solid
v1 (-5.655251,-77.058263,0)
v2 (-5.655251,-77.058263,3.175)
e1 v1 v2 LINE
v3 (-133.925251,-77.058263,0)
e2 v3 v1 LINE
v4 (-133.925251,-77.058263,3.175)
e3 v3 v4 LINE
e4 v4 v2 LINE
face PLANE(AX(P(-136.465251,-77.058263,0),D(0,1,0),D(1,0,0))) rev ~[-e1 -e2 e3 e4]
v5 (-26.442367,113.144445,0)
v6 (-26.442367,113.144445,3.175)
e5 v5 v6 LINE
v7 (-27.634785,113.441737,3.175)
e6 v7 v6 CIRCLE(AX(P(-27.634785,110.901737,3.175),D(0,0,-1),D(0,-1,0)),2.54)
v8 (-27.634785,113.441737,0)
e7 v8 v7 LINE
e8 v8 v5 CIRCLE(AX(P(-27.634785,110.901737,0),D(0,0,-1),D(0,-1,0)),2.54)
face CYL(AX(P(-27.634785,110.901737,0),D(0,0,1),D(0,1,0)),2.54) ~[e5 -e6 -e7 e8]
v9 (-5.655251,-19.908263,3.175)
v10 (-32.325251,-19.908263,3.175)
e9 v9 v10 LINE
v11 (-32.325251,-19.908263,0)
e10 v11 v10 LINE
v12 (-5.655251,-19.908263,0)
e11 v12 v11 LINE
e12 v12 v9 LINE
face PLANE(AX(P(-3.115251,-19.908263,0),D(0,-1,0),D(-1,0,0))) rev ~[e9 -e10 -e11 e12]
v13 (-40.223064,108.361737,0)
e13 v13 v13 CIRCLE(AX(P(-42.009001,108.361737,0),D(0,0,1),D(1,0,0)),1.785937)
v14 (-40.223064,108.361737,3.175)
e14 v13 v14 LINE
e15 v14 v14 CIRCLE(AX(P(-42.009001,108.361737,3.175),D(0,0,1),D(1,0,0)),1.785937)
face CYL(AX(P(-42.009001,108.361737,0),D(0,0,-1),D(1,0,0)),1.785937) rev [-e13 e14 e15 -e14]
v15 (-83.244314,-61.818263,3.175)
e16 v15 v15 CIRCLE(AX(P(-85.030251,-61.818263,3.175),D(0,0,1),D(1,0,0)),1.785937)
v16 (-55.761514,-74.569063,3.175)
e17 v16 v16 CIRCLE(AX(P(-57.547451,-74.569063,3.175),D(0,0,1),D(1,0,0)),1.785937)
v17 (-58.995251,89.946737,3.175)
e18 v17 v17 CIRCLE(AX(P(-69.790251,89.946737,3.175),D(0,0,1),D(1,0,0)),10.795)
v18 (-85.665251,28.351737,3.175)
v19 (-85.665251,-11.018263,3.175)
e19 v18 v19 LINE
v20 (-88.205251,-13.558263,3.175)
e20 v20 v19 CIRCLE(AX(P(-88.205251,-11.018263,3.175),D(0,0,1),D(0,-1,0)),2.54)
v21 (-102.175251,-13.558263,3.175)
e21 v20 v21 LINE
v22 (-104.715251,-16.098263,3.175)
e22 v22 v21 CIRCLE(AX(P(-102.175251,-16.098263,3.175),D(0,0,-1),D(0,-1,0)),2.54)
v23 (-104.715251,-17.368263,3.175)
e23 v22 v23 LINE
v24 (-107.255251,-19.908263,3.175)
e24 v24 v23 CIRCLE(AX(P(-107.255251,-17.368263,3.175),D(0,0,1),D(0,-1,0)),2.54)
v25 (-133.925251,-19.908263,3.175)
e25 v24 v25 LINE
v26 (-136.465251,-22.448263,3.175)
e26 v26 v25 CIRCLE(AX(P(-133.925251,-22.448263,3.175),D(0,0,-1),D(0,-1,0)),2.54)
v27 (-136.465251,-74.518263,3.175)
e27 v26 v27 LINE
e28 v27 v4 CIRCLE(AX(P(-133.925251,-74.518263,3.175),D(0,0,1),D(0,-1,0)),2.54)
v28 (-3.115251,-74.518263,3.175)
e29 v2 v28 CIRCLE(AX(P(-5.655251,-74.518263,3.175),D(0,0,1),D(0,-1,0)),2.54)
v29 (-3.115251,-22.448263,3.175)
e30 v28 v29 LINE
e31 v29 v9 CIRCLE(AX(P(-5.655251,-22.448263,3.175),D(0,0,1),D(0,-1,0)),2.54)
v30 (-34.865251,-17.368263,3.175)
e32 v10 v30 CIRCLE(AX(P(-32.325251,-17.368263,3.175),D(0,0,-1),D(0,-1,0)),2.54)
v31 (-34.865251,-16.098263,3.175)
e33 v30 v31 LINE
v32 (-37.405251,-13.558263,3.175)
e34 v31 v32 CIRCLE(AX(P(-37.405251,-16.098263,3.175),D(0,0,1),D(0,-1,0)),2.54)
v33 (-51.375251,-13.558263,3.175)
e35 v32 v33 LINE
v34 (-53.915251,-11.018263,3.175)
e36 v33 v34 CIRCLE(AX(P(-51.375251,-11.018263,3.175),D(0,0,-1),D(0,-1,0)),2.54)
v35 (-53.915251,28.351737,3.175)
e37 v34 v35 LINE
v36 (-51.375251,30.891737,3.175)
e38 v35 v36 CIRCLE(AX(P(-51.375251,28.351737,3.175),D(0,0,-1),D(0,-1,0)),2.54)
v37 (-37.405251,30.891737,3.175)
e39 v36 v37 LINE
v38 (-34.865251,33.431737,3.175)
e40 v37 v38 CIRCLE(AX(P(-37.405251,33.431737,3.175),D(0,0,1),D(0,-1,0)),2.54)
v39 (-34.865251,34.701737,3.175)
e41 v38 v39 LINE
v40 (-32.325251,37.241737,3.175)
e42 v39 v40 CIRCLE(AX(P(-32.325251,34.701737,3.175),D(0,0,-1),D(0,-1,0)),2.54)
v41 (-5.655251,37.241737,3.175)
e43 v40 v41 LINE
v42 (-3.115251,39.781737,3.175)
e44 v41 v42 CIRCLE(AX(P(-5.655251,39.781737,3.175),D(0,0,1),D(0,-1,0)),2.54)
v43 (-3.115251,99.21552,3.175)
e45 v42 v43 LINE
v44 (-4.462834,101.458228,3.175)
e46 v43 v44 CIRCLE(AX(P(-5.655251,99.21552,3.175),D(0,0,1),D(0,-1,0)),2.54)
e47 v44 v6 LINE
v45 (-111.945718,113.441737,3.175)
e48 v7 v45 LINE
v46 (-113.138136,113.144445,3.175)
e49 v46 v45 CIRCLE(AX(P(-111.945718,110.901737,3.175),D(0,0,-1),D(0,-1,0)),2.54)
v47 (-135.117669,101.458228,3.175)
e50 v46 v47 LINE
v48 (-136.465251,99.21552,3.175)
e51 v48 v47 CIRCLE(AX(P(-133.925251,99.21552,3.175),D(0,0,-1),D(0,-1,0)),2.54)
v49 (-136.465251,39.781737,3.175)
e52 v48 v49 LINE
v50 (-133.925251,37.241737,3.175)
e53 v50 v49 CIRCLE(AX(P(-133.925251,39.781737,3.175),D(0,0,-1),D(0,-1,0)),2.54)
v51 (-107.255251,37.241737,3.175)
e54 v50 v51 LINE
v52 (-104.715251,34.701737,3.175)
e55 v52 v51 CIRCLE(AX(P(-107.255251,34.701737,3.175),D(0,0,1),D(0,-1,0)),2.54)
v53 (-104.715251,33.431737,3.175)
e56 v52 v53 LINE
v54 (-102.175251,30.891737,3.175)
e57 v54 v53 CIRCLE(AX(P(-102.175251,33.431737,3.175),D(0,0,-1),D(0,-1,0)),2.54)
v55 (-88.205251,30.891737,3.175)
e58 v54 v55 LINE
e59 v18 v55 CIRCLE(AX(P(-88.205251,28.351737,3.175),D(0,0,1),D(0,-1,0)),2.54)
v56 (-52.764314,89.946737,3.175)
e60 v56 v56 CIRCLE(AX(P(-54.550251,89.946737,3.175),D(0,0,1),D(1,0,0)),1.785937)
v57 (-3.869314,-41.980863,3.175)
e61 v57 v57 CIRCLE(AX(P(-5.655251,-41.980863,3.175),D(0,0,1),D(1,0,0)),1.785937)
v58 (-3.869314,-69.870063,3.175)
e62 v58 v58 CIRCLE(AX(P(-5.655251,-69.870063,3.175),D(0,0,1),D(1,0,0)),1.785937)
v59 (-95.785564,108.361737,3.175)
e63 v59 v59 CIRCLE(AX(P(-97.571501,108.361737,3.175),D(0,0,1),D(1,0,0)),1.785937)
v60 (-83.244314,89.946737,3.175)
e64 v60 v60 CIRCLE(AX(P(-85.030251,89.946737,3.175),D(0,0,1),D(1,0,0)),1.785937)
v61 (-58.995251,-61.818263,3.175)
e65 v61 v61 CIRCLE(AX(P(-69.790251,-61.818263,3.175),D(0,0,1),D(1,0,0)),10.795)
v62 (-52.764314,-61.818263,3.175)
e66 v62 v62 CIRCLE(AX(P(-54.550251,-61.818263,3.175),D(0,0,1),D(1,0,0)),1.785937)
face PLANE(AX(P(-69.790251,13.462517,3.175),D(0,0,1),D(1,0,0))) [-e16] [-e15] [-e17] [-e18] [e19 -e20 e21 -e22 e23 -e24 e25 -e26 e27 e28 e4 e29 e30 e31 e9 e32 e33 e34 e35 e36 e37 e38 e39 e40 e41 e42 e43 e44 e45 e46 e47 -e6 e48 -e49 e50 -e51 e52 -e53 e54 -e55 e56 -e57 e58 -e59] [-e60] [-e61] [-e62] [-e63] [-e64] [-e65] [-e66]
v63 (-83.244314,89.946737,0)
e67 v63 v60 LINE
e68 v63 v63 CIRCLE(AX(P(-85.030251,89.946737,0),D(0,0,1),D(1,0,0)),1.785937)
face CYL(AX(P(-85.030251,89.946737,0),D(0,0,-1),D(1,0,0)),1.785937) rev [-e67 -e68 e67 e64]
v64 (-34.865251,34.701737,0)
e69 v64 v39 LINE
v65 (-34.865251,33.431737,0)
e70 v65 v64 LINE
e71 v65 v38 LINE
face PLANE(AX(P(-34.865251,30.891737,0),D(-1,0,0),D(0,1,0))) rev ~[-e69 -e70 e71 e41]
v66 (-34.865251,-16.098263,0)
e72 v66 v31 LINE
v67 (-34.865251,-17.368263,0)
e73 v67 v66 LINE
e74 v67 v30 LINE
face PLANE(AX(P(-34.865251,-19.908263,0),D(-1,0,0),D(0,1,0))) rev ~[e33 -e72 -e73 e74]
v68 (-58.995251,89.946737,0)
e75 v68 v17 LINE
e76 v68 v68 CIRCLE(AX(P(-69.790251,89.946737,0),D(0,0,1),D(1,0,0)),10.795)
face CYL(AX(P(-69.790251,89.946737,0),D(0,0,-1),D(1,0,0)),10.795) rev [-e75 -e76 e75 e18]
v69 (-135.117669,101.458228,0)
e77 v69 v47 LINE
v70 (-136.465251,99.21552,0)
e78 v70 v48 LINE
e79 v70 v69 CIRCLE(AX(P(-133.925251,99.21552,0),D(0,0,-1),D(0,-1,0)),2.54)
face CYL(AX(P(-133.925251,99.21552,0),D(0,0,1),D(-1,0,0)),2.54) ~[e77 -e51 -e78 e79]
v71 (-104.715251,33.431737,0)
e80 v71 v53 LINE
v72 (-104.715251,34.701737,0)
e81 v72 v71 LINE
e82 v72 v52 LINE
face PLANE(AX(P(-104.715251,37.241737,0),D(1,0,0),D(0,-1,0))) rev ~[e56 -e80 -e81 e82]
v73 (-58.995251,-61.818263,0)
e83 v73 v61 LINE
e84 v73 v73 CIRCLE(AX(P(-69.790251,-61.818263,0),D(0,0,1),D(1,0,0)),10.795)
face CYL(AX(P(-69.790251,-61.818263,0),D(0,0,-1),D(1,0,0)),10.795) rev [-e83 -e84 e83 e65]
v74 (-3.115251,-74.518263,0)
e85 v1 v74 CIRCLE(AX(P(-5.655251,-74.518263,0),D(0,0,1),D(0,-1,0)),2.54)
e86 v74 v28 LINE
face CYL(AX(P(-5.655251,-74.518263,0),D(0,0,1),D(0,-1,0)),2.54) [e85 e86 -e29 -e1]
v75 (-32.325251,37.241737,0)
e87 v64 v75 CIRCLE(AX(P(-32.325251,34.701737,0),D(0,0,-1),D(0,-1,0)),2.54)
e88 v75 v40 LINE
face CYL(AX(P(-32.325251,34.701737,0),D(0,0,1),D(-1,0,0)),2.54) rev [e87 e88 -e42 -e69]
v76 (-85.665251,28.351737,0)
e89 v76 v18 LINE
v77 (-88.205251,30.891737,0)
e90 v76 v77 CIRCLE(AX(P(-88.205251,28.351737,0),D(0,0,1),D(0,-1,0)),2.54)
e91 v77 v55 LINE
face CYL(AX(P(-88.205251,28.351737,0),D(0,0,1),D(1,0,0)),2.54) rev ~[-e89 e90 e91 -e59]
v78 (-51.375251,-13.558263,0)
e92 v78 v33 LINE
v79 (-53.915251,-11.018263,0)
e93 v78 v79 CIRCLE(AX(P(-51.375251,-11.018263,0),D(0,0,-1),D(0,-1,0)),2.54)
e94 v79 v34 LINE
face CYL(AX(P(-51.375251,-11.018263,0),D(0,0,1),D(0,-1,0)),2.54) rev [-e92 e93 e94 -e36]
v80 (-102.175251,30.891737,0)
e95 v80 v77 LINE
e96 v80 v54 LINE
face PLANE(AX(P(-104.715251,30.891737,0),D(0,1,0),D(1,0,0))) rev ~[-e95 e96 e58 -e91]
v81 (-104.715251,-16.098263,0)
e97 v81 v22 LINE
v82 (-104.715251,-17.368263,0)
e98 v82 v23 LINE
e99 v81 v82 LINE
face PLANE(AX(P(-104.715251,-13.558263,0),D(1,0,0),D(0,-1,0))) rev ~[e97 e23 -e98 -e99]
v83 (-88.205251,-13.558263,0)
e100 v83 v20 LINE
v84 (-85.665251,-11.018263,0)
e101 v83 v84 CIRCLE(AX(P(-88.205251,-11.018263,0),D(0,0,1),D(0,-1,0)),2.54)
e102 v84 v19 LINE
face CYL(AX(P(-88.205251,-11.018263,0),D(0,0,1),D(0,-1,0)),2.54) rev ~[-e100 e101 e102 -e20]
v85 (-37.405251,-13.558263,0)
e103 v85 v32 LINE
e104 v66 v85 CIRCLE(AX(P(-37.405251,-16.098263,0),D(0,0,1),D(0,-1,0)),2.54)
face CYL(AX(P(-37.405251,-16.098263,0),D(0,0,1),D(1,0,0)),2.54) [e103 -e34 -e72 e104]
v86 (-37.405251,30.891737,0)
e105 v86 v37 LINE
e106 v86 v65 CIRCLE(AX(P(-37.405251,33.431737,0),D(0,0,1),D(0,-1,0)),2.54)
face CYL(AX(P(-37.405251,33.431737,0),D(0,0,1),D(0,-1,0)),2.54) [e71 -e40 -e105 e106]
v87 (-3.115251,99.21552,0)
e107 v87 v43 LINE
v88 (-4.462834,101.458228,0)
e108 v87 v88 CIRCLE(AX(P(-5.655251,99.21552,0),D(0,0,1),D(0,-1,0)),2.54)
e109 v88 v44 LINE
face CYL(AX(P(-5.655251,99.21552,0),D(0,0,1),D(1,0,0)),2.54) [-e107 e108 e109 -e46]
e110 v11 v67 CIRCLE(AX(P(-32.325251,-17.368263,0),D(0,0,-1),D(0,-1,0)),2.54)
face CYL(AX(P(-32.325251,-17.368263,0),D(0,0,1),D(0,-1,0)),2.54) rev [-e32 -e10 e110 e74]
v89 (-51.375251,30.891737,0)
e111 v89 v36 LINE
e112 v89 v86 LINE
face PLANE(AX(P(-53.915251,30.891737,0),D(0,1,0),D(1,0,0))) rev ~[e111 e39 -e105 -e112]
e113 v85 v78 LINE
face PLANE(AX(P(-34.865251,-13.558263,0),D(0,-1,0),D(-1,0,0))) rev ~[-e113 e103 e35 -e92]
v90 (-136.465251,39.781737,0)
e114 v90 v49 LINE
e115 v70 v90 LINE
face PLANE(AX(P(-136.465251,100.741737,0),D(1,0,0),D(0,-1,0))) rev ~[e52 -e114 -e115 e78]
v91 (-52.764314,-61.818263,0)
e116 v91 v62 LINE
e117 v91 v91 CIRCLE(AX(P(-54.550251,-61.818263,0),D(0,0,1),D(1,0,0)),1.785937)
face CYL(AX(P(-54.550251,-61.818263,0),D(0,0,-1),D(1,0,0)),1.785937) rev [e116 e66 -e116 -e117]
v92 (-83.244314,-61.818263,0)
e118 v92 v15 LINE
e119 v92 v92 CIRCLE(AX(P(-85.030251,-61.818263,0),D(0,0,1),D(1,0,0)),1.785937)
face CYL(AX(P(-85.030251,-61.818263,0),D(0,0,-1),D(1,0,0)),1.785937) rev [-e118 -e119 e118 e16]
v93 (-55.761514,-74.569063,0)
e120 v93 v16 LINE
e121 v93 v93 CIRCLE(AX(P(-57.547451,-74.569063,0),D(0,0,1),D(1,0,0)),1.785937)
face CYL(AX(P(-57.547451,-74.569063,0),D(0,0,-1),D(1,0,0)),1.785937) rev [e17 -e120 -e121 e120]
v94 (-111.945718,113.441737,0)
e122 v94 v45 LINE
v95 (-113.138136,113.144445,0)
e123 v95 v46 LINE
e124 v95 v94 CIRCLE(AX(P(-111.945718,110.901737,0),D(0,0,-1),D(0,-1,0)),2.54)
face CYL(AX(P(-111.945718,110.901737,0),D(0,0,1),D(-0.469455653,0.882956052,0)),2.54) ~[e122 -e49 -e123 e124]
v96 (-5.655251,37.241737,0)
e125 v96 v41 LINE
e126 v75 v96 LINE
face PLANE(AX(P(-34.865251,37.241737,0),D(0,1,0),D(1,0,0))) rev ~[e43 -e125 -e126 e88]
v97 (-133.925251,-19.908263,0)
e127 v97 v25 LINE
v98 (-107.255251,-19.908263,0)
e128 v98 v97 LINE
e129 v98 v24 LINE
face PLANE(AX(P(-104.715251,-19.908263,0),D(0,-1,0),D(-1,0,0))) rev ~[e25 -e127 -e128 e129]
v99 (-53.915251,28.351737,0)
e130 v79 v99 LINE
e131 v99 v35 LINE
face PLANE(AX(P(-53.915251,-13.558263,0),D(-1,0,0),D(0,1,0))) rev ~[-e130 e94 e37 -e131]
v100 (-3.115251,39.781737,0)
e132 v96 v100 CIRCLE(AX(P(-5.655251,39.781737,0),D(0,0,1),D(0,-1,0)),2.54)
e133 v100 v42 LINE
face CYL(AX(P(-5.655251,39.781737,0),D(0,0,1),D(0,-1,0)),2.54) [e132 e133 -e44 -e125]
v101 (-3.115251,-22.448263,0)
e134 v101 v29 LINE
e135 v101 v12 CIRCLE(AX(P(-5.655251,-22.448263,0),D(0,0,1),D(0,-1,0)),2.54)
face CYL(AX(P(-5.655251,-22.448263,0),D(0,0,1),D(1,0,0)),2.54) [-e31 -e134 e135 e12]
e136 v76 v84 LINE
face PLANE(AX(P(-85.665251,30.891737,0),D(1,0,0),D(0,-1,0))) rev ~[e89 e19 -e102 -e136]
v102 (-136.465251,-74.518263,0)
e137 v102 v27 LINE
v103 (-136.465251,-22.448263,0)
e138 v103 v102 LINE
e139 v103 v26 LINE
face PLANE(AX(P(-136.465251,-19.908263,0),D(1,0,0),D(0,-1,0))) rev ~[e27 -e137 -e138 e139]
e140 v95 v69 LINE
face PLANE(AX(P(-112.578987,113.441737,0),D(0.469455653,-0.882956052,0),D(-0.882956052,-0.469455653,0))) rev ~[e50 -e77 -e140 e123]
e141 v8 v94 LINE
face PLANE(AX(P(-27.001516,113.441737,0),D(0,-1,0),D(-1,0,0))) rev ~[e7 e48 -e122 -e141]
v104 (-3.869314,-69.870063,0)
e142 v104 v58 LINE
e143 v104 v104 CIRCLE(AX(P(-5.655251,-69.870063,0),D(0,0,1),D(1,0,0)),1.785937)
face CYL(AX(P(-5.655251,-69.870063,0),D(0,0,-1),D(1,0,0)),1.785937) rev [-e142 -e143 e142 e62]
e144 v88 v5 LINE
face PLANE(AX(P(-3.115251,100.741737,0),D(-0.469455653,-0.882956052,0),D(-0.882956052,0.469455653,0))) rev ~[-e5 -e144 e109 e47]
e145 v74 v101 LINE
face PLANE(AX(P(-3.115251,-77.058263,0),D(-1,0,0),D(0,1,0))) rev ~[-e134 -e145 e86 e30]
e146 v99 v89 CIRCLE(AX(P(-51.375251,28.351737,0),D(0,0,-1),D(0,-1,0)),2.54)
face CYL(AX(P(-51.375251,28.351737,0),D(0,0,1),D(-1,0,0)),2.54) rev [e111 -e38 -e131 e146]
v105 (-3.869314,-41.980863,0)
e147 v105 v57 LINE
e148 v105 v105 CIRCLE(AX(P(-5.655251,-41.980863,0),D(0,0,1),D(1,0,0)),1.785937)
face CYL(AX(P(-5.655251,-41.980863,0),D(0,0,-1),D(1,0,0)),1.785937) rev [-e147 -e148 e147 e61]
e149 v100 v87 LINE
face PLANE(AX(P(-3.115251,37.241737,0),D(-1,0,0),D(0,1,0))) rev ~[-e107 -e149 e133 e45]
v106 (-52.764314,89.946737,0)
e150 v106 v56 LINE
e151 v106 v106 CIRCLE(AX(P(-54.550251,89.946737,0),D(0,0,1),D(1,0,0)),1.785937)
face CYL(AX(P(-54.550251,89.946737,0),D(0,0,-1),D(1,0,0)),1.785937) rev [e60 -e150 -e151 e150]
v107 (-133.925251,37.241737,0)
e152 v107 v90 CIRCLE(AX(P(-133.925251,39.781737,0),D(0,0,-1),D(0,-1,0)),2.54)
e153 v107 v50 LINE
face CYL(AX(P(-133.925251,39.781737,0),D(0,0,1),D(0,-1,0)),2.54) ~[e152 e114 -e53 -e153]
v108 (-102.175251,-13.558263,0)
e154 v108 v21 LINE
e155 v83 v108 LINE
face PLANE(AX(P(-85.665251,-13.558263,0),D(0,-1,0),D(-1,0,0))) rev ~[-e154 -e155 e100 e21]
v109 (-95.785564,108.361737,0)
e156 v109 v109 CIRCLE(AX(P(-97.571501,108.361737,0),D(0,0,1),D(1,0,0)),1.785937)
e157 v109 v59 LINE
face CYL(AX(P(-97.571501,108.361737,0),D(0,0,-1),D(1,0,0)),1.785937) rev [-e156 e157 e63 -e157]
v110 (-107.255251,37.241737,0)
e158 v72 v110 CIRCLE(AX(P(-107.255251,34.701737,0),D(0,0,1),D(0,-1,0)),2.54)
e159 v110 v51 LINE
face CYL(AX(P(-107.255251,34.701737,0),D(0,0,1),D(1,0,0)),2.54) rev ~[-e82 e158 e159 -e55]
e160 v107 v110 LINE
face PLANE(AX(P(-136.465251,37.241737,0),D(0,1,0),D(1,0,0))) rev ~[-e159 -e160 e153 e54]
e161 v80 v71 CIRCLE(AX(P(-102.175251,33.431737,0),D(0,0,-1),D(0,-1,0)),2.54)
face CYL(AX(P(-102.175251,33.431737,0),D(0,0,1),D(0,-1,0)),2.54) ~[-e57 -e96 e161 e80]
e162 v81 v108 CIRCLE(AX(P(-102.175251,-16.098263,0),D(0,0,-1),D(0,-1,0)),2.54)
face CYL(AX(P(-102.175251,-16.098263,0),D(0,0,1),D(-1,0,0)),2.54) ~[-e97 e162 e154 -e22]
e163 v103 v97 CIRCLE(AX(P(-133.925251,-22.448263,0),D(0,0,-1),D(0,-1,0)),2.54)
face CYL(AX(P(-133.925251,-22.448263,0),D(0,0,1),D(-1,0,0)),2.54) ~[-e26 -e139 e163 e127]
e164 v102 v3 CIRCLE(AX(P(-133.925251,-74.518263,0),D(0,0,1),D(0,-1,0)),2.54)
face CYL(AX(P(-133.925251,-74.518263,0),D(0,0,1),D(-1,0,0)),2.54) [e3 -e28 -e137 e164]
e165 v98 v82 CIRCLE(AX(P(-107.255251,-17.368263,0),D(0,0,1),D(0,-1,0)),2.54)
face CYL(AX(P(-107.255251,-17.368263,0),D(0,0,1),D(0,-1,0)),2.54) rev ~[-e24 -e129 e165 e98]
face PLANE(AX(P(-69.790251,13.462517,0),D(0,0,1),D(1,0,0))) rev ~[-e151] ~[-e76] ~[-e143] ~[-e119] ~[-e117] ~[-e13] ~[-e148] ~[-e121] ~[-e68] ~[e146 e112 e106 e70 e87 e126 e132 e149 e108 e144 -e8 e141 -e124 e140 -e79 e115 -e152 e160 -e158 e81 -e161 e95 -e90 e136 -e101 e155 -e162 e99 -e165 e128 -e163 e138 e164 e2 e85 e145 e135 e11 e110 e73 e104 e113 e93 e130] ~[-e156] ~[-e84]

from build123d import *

# Parameters (mm, degrees)
F0_R     = 1.7859375
F0_R_2   = 10.795
F1_DEPTH = 3.175
F2_R     = 2.54


with BuildPart() as f1:
    # F0 (on Top) → F1 (new body)
    with BuildSketch(Plane.XY):
        Polygon((-136.4652514458, -19.908263123), (-136.4652514458, -77.058263123), (-3.1152514458, -77.058263123), (-3.1152514458, -19.908263123), (-34.8652514458, -19.908263123), (-34.8652514458, -13.558263123), (-53.9152514458, -13.558263123), (-53.9152514458, 30.891736877), (-34.8652514458, 30.891736877), (-34.8652514458, 37.241736877), (-3.1152514458, 37.241736877), (-3.1152514458, 100.741736877), (-27.0015158653, 113.441736877), (-112.5789870262, 113.441736877), (-136.4652514458, 100.741736877), (-136.4652514458, 37.241736877), (-104.7152514458, 37.241736877), (-104.7152514458, 30.891736877), (-85.6652514458, 30.891736877), (-85.6652514458, -13.558263123), (-104.7152514458, -13.558263123), (-104.7152514458, -19.908263123), align=None)
        with Locations((-85.0302514458, -61.818263123)):
            Circle(F0_R, mode=Mode.SUBTRACT)
        with Locations((-57.5474514458, -74.569063123)):
            Circle(F0_R, mode=Mode.SUBTRACT)
        with Locations((-69.7902514458, -61.818263123)):
            Circle(F0_R_2, mode=Mode.SUBTRACT)
        with Locations((-54.5502514458, -61.818263123)):
            Circle(F0_R, mode=Mode.SUBTRACT)
        with Locations((-5.6552514458, -69.870063123)):
            Circle(F0_R, mode=Mode.SUBTRACT)
        with Locations((-5.6552514458, -41.980863123)):
            Circle(F0_R, mode=Mode.SUBTRACT)
        with Locations((-97.5715014458, 108.361736877)):
            Circle(F0_R, mode=Mode.SUBTRACT)
        with Locations((-85.0302514458, 89.946736877)):
            Circle(F0_R, mode=Mode.SUBTRACT)
        with Locations((-69.7902514458, 89.946736877)):
            Circle(F0_R_2, mode=Mode.SUBTRACT)
        with Locations((-54.5502514458, 89.946736877)):
            Circle(F0_R, mode=Mode.SUBTRACT)
        with Locations((-42.0090014458, 108.361736877)):
            Circle(F0_R, mode=Mode.SUBTRACT)
    extrude(amount=F1_DEPTH)

    # F2
    f2_edges = [f1.edges().sort_by_distance(p)[0] for p in [
        (-34.865251, 37.241737, 1.5875),
        (-3.115251, -19.908263, 1.5875),
        (-3.115251, 37.241737, 1.5875),
        (-3.115251, -77.058263, 1.5875),
        (-136.465251, -77.058263, 1.5875),
        (-3.115251, 100.741737, 1.5875),
        (-27.001516, 113.441737, 1.5875),
        (-112.578987, 113.441737, 1.5875),
        (-136.465251, 100.741737, 1.5875),
        (-136.465251, 37.241737, 1.5875),
        (-104.715251, 37.241737, 1.5875),
        (-136.465251, -19.908263, 1.5875),
        (-53.915251, 30.891737, 1.5875),
        (-53.915251, -13.558263, 1.5875),
        (-85.665251, -13.558263, 1.5875),
        (-104.715251, -13.558263, 1.5875),
        (-85.665251, 30.891737, 1.5875),
        (-34.865251, -13.558263, 1.5875),
        (-104.715251, 30.891737, 1.5875),
        (-104.715251, -19.908263, 1.5875),
        (-34.865251, -19.908263, 1.5875),
        (-34.865251, 30.891737, 1.5875),
    ]]
    fillet(f2_edges, radius=F2_R)


solid = f1.part
